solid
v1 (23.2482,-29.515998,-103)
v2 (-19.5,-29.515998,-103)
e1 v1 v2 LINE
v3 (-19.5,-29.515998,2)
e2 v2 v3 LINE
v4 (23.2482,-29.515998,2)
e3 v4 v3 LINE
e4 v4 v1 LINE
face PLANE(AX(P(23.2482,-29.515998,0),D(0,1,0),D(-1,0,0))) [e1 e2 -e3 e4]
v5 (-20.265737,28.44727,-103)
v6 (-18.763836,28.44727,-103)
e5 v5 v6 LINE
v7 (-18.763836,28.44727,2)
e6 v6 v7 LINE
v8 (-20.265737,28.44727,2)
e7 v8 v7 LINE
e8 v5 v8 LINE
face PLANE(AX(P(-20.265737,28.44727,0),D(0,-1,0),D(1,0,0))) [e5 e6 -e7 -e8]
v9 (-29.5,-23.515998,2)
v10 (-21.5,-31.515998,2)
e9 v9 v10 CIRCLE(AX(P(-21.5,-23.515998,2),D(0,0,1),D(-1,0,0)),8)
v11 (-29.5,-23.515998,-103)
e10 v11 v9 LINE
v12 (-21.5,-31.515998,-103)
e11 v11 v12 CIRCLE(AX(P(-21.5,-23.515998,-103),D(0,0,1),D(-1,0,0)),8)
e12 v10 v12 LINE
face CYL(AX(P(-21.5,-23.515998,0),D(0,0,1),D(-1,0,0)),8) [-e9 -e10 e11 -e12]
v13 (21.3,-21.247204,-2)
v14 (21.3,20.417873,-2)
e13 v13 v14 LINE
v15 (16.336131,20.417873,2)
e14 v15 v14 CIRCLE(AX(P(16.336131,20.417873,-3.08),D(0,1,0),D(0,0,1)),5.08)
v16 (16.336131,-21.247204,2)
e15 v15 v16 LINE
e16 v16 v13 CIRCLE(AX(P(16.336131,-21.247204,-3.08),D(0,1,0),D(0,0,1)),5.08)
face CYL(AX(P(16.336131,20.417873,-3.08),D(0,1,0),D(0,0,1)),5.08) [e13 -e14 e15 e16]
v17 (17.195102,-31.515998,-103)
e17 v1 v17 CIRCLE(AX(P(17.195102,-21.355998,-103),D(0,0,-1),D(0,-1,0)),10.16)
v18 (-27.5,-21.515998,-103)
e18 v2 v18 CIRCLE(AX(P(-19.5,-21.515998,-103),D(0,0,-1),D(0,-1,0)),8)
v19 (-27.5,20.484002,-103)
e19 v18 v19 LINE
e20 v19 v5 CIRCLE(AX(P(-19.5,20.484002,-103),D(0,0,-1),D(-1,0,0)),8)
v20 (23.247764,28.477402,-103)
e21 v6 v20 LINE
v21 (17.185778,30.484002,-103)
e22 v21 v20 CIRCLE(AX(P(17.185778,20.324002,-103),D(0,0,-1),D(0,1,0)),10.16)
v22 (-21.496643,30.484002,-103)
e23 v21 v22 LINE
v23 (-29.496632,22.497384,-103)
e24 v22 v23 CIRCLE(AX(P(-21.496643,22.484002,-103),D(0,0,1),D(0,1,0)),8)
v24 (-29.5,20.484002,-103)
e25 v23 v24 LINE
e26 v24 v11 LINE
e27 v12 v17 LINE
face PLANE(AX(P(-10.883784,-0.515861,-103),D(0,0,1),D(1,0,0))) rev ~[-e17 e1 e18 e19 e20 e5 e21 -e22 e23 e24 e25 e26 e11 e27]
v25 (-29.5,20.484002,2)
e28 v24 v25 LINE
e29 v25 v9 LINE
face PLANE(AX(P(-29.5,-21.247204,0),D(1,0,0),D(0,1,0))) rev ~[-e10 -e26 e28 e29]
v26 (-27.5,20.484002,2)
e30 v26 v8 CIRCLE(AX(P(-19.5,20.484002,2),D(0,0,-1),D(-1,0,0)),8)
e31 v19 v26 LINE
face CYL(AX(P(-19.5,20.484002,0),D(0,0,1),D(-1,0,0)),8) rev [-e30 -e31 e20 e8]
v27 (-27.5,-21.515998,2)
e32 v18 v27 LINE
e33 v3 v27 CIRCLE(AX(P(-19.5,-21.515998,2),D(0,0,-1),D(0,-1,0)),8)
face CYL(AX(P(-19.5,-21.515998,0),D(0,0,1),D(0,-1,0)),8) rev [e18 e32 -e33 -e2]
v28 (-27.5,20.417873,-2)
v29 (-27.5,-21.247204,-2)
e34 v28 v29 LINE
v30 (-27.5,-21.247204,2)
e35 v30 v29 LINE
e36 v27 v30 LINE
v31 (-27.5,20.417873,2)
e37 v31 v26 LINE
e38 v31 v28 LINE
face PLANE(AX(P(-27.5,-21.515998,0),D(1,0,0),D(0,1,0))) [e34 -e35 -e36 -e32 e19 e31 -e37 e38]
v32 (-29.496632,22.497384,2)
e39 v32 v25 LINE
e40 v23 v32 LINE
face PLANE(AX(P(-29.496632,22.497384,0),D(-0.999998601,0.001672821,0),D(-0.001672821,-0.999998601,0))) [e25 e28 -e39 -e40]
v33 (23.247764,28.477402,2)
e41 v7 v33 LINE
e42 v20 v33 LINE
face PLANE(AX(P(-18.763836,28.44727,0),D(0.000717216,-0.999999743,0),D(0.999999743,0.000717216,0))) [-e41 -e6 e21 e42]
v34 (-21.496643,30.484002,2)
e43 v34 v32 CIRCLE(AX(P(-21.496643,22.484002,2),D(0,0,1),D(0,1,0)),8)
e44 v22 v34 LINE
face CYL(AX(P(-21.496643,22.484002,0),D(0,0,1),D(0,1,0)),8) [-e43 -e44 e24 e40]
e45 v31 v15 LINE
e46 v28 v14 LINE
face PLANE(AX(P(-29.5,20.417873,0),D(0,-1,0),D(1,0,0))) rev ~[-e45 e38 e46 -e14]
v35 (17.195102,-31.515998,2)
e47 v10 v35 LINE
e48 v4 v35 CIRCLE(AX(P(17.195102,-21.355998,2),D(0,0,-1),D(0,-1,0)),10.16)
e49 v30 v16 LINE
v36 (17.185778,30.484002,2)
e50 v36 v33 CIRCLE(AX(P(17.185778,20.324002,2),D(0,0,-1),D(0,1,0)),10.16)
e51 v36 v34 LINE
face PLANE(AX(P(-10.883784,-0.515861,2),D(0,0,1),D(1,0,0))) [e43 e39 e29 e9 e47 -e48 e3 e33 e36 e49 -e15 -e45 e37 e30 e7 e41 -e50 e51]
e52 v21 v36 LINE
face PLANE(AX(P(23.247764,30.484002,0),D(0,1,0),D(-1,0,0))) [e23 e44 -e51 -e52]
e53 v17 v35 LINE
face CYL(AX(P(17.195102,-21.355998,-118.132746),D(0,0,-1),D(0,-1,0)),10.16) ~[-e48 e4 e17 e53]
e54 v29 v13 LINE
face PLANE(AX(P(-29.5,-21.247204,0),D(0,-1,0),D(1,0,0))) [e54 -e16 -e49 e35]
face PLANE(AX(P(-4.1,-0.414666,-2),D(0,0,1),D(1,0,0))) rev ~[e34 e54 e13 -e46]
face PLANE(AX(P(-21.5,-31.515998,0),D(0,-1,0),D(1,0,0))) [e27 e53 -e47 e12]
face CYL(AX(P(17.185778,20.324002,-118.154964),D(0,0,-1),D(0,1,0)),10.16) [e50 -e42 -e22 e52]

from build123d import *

# Parameters (mm, degrees)
F1_DEPTH    = 2
F2_DEPTH    = 103
F3_W        = 50.8
F3_H        = 41.6650772095
F4_DEPTH    = 2
F5_T1_DEPTH = 135.3099275981
F5_T3_DEPTH = 135.2654919008
F6_T1_DEPTH = 41.6650772095


# Not quite as in the source:
# - a fillet or chamfer that OpenCascade refuses, or shapes differently, is made with other operations: its cross-section is extruded or revolved along the edge and cut away or added
# - a feature names something its author has since deleted; it is built from what else it names


with BuildPart() as f1:
    # F0 (on Top) → F1 (new body)
    with BuildSketch(Plane.XY):
        with BuildLine():
            Line((23.2482, -29.5159982), (-19.5, -29.5159982))
            ThreePointArc((-19.5, -29.5159982), (-25.1568542495, -27.1728524495), (-27.5, -21.5159982))
            Line((-27.5, -21.5159982), (-27.5, 20.4840018))
            ThreePointArc((-27.5, 20.4840018), (-25.4213975047, 25.863318819), (-20.2657371023, 28.4472703934))
            Line((-20.2657371023, 28.4472703934), (-18.7638364732, 28.4472703934))
            Line((-18.7638364732, 28.4472703934), (23.2477635268, 28.4774018))
            Line((23.2477635268, 28.4774018), (23.2477635268, 30.4840018))
            Line((23.2477635268, 30.4840018), (-13.8766431592, 30.4840018))
            Line((-13.8766431592, 30.4840018), (-18.7638364732, 30.4840018))
            Line((-18.7638364732, 30.4840018), (-21.4966431592, 30.4840018))
            ThreePointArc((-21.4966431592, 30.4840018), (-27.1487639749, 28.1455855258), (-29.4966319659, 22.4973843711))
            Line((-29.4966319659, 22.4973843711), (-29.5, 20.4840018))
            Line((-29.5, 20.4840018), (-29.5, -21.5159982))
            Line((-29.5, -21.5159982), (-29.5, -23.5159982))
            ThreePointArc((-29.5, -23.5159982), (-27.1568542495, -29.1728524495), (-21.5, -31.5159982))
            Line((-21.5, -31.5159982), (-19.5, -31.5159982))
            Line((-19.5, -31.5159982), (23.2482, -31.5159982))
            Line((23.2482, -31.5159982), (23.2482, -29.5159982))
        make_face()
    extrude(amount=F1_DEPTH)

    # F0 (on Top) → F2 (join)
    with BuildSketch(Plane.XY):
        with BuildLine():
            Line((23.2482, -29.5159982), (-19.5, -29.5159982))
            ThreePointArc((-19.5, -29.5159982), (-25.1568542495, -27.1728524495), (-27.5, -21.5159982))
            Line((-27.5, -21.5159982), (-27.5, 20.4840018))
            ThreePointArc((-27.5, 20.4840018), (-25.4213975047, 25.863318819), (-20.2657371023, 28.4472703934))
            Line((-20.2657371023, 28.4472703934), (-18.7638364732, 28.4472703934))
            Line((-18.7638364732, 28.4472703934), (23.2477635268, 28.4774018))
            Line((23.2477635268, 28.4774018), (23.2477635268, 30.4840018))
            Line((23.2477635268, 30.4840018), (-13.8766431592, 30.4840018))
            Line((-13.8766431592, 30.4840018), (-18.7638364732, 30.4840018))
            Line((-18.7638364732, 30.4840018), (-21.4966431592, 30.4840018))
            ThreePointArc((-21.4966431592, 30.4840018), (-27.1487639749, 28.1455855258), (-29.4966319659, 22.4973843711))
            Line((-29.4966319659, 22.4973843711), (-29.5, 20.4840018))
            Line((-29.5, 20.4840018), (-29.5, -21.5159982))
            Line((-29.5, -21.5159982), (-29.5, -23.5159982))
            ThreePointArc((-29.5, -23.5159982), (-27.1568542495, -29.1728524495), (-21.5, -31.5159982))
            Line((-21.5, -31.5159982), (-19.5, -31.5159982))
            Line((-19.5, -31.5159982), (23.2482, -31.5159982))
            Line((23.2482, -31.5159982), (23.2482, -29.5159982))
        make_face()
    extrude(amount=-F2_DEPTH)

    # F3 (on Top) → F4 (join, symmetric)
    with BuildSketch(Plane.XY):
        with Locations((-4.1, -0.4146657884)):
            Rectangle(F3_W, F3_H)
    extrude(amount=F4_DEPTH, both=True)

    # F5: fillet of radius 10.16 on 2 edges, made by hand

    # F5_s2 → F5_t1 (cut)
    with BuildSketch(Plane.XY.offset(-118.154963799)):
        with BuildLine():
            ThreePointArc((17.1857780072, 30.4840018), (20.3785085, 29.9693152734), (23.2477635268, 28.4774018))
            Line((23.2477635268, 28.4774018), (23.2477635268, 30.4840018))
            Line((23.2477635268, 30.4840018), (17.1857780072, 30.4840018))
        make_face()
    extrude(amount=F5_T1_DEPTH, mode=Mode.SUBTRACT)

    # F5_s4 → F5_t3 (cut)
    with BuildSketch(Plane.XY.offset(-118.1327459504)):
        with BuildLine():
            ThreePointArc((17.1951016198, -31.5159982), (20.3825771099, -31.003049563), (23.2482, -29.5159982))
            Line((23.2482, -29.5159982), (23.2482, -31.5159982))
            Line((23.2482, -31.5159982), (17.1951016198, -31.5159982))
        make_face()
    extrude(amount=F5_T3_DEPTH, mode=Mode.SUBTRACT)

    # F6: fillet of radius 5.08 on 1 edges, made by hand

    # F6_s2 → F6_t1 (cut)
    with BuildSketch(Plane.XZ.offset(-20.4178728163)):
        with BuildLine():
            ThreePointArc((16.3361305416, 2), (19.5236060317, 0.8755530587), (21.3, -2))
            Line((21.3, -2), (21.3, 2))
            Line((21.3, 2), (16.3361305416, 2))
        make_face()
    extrude(amount=F6_T1_DEPTH, mode=Mode.SUBTRACT)


solid = f1.part
